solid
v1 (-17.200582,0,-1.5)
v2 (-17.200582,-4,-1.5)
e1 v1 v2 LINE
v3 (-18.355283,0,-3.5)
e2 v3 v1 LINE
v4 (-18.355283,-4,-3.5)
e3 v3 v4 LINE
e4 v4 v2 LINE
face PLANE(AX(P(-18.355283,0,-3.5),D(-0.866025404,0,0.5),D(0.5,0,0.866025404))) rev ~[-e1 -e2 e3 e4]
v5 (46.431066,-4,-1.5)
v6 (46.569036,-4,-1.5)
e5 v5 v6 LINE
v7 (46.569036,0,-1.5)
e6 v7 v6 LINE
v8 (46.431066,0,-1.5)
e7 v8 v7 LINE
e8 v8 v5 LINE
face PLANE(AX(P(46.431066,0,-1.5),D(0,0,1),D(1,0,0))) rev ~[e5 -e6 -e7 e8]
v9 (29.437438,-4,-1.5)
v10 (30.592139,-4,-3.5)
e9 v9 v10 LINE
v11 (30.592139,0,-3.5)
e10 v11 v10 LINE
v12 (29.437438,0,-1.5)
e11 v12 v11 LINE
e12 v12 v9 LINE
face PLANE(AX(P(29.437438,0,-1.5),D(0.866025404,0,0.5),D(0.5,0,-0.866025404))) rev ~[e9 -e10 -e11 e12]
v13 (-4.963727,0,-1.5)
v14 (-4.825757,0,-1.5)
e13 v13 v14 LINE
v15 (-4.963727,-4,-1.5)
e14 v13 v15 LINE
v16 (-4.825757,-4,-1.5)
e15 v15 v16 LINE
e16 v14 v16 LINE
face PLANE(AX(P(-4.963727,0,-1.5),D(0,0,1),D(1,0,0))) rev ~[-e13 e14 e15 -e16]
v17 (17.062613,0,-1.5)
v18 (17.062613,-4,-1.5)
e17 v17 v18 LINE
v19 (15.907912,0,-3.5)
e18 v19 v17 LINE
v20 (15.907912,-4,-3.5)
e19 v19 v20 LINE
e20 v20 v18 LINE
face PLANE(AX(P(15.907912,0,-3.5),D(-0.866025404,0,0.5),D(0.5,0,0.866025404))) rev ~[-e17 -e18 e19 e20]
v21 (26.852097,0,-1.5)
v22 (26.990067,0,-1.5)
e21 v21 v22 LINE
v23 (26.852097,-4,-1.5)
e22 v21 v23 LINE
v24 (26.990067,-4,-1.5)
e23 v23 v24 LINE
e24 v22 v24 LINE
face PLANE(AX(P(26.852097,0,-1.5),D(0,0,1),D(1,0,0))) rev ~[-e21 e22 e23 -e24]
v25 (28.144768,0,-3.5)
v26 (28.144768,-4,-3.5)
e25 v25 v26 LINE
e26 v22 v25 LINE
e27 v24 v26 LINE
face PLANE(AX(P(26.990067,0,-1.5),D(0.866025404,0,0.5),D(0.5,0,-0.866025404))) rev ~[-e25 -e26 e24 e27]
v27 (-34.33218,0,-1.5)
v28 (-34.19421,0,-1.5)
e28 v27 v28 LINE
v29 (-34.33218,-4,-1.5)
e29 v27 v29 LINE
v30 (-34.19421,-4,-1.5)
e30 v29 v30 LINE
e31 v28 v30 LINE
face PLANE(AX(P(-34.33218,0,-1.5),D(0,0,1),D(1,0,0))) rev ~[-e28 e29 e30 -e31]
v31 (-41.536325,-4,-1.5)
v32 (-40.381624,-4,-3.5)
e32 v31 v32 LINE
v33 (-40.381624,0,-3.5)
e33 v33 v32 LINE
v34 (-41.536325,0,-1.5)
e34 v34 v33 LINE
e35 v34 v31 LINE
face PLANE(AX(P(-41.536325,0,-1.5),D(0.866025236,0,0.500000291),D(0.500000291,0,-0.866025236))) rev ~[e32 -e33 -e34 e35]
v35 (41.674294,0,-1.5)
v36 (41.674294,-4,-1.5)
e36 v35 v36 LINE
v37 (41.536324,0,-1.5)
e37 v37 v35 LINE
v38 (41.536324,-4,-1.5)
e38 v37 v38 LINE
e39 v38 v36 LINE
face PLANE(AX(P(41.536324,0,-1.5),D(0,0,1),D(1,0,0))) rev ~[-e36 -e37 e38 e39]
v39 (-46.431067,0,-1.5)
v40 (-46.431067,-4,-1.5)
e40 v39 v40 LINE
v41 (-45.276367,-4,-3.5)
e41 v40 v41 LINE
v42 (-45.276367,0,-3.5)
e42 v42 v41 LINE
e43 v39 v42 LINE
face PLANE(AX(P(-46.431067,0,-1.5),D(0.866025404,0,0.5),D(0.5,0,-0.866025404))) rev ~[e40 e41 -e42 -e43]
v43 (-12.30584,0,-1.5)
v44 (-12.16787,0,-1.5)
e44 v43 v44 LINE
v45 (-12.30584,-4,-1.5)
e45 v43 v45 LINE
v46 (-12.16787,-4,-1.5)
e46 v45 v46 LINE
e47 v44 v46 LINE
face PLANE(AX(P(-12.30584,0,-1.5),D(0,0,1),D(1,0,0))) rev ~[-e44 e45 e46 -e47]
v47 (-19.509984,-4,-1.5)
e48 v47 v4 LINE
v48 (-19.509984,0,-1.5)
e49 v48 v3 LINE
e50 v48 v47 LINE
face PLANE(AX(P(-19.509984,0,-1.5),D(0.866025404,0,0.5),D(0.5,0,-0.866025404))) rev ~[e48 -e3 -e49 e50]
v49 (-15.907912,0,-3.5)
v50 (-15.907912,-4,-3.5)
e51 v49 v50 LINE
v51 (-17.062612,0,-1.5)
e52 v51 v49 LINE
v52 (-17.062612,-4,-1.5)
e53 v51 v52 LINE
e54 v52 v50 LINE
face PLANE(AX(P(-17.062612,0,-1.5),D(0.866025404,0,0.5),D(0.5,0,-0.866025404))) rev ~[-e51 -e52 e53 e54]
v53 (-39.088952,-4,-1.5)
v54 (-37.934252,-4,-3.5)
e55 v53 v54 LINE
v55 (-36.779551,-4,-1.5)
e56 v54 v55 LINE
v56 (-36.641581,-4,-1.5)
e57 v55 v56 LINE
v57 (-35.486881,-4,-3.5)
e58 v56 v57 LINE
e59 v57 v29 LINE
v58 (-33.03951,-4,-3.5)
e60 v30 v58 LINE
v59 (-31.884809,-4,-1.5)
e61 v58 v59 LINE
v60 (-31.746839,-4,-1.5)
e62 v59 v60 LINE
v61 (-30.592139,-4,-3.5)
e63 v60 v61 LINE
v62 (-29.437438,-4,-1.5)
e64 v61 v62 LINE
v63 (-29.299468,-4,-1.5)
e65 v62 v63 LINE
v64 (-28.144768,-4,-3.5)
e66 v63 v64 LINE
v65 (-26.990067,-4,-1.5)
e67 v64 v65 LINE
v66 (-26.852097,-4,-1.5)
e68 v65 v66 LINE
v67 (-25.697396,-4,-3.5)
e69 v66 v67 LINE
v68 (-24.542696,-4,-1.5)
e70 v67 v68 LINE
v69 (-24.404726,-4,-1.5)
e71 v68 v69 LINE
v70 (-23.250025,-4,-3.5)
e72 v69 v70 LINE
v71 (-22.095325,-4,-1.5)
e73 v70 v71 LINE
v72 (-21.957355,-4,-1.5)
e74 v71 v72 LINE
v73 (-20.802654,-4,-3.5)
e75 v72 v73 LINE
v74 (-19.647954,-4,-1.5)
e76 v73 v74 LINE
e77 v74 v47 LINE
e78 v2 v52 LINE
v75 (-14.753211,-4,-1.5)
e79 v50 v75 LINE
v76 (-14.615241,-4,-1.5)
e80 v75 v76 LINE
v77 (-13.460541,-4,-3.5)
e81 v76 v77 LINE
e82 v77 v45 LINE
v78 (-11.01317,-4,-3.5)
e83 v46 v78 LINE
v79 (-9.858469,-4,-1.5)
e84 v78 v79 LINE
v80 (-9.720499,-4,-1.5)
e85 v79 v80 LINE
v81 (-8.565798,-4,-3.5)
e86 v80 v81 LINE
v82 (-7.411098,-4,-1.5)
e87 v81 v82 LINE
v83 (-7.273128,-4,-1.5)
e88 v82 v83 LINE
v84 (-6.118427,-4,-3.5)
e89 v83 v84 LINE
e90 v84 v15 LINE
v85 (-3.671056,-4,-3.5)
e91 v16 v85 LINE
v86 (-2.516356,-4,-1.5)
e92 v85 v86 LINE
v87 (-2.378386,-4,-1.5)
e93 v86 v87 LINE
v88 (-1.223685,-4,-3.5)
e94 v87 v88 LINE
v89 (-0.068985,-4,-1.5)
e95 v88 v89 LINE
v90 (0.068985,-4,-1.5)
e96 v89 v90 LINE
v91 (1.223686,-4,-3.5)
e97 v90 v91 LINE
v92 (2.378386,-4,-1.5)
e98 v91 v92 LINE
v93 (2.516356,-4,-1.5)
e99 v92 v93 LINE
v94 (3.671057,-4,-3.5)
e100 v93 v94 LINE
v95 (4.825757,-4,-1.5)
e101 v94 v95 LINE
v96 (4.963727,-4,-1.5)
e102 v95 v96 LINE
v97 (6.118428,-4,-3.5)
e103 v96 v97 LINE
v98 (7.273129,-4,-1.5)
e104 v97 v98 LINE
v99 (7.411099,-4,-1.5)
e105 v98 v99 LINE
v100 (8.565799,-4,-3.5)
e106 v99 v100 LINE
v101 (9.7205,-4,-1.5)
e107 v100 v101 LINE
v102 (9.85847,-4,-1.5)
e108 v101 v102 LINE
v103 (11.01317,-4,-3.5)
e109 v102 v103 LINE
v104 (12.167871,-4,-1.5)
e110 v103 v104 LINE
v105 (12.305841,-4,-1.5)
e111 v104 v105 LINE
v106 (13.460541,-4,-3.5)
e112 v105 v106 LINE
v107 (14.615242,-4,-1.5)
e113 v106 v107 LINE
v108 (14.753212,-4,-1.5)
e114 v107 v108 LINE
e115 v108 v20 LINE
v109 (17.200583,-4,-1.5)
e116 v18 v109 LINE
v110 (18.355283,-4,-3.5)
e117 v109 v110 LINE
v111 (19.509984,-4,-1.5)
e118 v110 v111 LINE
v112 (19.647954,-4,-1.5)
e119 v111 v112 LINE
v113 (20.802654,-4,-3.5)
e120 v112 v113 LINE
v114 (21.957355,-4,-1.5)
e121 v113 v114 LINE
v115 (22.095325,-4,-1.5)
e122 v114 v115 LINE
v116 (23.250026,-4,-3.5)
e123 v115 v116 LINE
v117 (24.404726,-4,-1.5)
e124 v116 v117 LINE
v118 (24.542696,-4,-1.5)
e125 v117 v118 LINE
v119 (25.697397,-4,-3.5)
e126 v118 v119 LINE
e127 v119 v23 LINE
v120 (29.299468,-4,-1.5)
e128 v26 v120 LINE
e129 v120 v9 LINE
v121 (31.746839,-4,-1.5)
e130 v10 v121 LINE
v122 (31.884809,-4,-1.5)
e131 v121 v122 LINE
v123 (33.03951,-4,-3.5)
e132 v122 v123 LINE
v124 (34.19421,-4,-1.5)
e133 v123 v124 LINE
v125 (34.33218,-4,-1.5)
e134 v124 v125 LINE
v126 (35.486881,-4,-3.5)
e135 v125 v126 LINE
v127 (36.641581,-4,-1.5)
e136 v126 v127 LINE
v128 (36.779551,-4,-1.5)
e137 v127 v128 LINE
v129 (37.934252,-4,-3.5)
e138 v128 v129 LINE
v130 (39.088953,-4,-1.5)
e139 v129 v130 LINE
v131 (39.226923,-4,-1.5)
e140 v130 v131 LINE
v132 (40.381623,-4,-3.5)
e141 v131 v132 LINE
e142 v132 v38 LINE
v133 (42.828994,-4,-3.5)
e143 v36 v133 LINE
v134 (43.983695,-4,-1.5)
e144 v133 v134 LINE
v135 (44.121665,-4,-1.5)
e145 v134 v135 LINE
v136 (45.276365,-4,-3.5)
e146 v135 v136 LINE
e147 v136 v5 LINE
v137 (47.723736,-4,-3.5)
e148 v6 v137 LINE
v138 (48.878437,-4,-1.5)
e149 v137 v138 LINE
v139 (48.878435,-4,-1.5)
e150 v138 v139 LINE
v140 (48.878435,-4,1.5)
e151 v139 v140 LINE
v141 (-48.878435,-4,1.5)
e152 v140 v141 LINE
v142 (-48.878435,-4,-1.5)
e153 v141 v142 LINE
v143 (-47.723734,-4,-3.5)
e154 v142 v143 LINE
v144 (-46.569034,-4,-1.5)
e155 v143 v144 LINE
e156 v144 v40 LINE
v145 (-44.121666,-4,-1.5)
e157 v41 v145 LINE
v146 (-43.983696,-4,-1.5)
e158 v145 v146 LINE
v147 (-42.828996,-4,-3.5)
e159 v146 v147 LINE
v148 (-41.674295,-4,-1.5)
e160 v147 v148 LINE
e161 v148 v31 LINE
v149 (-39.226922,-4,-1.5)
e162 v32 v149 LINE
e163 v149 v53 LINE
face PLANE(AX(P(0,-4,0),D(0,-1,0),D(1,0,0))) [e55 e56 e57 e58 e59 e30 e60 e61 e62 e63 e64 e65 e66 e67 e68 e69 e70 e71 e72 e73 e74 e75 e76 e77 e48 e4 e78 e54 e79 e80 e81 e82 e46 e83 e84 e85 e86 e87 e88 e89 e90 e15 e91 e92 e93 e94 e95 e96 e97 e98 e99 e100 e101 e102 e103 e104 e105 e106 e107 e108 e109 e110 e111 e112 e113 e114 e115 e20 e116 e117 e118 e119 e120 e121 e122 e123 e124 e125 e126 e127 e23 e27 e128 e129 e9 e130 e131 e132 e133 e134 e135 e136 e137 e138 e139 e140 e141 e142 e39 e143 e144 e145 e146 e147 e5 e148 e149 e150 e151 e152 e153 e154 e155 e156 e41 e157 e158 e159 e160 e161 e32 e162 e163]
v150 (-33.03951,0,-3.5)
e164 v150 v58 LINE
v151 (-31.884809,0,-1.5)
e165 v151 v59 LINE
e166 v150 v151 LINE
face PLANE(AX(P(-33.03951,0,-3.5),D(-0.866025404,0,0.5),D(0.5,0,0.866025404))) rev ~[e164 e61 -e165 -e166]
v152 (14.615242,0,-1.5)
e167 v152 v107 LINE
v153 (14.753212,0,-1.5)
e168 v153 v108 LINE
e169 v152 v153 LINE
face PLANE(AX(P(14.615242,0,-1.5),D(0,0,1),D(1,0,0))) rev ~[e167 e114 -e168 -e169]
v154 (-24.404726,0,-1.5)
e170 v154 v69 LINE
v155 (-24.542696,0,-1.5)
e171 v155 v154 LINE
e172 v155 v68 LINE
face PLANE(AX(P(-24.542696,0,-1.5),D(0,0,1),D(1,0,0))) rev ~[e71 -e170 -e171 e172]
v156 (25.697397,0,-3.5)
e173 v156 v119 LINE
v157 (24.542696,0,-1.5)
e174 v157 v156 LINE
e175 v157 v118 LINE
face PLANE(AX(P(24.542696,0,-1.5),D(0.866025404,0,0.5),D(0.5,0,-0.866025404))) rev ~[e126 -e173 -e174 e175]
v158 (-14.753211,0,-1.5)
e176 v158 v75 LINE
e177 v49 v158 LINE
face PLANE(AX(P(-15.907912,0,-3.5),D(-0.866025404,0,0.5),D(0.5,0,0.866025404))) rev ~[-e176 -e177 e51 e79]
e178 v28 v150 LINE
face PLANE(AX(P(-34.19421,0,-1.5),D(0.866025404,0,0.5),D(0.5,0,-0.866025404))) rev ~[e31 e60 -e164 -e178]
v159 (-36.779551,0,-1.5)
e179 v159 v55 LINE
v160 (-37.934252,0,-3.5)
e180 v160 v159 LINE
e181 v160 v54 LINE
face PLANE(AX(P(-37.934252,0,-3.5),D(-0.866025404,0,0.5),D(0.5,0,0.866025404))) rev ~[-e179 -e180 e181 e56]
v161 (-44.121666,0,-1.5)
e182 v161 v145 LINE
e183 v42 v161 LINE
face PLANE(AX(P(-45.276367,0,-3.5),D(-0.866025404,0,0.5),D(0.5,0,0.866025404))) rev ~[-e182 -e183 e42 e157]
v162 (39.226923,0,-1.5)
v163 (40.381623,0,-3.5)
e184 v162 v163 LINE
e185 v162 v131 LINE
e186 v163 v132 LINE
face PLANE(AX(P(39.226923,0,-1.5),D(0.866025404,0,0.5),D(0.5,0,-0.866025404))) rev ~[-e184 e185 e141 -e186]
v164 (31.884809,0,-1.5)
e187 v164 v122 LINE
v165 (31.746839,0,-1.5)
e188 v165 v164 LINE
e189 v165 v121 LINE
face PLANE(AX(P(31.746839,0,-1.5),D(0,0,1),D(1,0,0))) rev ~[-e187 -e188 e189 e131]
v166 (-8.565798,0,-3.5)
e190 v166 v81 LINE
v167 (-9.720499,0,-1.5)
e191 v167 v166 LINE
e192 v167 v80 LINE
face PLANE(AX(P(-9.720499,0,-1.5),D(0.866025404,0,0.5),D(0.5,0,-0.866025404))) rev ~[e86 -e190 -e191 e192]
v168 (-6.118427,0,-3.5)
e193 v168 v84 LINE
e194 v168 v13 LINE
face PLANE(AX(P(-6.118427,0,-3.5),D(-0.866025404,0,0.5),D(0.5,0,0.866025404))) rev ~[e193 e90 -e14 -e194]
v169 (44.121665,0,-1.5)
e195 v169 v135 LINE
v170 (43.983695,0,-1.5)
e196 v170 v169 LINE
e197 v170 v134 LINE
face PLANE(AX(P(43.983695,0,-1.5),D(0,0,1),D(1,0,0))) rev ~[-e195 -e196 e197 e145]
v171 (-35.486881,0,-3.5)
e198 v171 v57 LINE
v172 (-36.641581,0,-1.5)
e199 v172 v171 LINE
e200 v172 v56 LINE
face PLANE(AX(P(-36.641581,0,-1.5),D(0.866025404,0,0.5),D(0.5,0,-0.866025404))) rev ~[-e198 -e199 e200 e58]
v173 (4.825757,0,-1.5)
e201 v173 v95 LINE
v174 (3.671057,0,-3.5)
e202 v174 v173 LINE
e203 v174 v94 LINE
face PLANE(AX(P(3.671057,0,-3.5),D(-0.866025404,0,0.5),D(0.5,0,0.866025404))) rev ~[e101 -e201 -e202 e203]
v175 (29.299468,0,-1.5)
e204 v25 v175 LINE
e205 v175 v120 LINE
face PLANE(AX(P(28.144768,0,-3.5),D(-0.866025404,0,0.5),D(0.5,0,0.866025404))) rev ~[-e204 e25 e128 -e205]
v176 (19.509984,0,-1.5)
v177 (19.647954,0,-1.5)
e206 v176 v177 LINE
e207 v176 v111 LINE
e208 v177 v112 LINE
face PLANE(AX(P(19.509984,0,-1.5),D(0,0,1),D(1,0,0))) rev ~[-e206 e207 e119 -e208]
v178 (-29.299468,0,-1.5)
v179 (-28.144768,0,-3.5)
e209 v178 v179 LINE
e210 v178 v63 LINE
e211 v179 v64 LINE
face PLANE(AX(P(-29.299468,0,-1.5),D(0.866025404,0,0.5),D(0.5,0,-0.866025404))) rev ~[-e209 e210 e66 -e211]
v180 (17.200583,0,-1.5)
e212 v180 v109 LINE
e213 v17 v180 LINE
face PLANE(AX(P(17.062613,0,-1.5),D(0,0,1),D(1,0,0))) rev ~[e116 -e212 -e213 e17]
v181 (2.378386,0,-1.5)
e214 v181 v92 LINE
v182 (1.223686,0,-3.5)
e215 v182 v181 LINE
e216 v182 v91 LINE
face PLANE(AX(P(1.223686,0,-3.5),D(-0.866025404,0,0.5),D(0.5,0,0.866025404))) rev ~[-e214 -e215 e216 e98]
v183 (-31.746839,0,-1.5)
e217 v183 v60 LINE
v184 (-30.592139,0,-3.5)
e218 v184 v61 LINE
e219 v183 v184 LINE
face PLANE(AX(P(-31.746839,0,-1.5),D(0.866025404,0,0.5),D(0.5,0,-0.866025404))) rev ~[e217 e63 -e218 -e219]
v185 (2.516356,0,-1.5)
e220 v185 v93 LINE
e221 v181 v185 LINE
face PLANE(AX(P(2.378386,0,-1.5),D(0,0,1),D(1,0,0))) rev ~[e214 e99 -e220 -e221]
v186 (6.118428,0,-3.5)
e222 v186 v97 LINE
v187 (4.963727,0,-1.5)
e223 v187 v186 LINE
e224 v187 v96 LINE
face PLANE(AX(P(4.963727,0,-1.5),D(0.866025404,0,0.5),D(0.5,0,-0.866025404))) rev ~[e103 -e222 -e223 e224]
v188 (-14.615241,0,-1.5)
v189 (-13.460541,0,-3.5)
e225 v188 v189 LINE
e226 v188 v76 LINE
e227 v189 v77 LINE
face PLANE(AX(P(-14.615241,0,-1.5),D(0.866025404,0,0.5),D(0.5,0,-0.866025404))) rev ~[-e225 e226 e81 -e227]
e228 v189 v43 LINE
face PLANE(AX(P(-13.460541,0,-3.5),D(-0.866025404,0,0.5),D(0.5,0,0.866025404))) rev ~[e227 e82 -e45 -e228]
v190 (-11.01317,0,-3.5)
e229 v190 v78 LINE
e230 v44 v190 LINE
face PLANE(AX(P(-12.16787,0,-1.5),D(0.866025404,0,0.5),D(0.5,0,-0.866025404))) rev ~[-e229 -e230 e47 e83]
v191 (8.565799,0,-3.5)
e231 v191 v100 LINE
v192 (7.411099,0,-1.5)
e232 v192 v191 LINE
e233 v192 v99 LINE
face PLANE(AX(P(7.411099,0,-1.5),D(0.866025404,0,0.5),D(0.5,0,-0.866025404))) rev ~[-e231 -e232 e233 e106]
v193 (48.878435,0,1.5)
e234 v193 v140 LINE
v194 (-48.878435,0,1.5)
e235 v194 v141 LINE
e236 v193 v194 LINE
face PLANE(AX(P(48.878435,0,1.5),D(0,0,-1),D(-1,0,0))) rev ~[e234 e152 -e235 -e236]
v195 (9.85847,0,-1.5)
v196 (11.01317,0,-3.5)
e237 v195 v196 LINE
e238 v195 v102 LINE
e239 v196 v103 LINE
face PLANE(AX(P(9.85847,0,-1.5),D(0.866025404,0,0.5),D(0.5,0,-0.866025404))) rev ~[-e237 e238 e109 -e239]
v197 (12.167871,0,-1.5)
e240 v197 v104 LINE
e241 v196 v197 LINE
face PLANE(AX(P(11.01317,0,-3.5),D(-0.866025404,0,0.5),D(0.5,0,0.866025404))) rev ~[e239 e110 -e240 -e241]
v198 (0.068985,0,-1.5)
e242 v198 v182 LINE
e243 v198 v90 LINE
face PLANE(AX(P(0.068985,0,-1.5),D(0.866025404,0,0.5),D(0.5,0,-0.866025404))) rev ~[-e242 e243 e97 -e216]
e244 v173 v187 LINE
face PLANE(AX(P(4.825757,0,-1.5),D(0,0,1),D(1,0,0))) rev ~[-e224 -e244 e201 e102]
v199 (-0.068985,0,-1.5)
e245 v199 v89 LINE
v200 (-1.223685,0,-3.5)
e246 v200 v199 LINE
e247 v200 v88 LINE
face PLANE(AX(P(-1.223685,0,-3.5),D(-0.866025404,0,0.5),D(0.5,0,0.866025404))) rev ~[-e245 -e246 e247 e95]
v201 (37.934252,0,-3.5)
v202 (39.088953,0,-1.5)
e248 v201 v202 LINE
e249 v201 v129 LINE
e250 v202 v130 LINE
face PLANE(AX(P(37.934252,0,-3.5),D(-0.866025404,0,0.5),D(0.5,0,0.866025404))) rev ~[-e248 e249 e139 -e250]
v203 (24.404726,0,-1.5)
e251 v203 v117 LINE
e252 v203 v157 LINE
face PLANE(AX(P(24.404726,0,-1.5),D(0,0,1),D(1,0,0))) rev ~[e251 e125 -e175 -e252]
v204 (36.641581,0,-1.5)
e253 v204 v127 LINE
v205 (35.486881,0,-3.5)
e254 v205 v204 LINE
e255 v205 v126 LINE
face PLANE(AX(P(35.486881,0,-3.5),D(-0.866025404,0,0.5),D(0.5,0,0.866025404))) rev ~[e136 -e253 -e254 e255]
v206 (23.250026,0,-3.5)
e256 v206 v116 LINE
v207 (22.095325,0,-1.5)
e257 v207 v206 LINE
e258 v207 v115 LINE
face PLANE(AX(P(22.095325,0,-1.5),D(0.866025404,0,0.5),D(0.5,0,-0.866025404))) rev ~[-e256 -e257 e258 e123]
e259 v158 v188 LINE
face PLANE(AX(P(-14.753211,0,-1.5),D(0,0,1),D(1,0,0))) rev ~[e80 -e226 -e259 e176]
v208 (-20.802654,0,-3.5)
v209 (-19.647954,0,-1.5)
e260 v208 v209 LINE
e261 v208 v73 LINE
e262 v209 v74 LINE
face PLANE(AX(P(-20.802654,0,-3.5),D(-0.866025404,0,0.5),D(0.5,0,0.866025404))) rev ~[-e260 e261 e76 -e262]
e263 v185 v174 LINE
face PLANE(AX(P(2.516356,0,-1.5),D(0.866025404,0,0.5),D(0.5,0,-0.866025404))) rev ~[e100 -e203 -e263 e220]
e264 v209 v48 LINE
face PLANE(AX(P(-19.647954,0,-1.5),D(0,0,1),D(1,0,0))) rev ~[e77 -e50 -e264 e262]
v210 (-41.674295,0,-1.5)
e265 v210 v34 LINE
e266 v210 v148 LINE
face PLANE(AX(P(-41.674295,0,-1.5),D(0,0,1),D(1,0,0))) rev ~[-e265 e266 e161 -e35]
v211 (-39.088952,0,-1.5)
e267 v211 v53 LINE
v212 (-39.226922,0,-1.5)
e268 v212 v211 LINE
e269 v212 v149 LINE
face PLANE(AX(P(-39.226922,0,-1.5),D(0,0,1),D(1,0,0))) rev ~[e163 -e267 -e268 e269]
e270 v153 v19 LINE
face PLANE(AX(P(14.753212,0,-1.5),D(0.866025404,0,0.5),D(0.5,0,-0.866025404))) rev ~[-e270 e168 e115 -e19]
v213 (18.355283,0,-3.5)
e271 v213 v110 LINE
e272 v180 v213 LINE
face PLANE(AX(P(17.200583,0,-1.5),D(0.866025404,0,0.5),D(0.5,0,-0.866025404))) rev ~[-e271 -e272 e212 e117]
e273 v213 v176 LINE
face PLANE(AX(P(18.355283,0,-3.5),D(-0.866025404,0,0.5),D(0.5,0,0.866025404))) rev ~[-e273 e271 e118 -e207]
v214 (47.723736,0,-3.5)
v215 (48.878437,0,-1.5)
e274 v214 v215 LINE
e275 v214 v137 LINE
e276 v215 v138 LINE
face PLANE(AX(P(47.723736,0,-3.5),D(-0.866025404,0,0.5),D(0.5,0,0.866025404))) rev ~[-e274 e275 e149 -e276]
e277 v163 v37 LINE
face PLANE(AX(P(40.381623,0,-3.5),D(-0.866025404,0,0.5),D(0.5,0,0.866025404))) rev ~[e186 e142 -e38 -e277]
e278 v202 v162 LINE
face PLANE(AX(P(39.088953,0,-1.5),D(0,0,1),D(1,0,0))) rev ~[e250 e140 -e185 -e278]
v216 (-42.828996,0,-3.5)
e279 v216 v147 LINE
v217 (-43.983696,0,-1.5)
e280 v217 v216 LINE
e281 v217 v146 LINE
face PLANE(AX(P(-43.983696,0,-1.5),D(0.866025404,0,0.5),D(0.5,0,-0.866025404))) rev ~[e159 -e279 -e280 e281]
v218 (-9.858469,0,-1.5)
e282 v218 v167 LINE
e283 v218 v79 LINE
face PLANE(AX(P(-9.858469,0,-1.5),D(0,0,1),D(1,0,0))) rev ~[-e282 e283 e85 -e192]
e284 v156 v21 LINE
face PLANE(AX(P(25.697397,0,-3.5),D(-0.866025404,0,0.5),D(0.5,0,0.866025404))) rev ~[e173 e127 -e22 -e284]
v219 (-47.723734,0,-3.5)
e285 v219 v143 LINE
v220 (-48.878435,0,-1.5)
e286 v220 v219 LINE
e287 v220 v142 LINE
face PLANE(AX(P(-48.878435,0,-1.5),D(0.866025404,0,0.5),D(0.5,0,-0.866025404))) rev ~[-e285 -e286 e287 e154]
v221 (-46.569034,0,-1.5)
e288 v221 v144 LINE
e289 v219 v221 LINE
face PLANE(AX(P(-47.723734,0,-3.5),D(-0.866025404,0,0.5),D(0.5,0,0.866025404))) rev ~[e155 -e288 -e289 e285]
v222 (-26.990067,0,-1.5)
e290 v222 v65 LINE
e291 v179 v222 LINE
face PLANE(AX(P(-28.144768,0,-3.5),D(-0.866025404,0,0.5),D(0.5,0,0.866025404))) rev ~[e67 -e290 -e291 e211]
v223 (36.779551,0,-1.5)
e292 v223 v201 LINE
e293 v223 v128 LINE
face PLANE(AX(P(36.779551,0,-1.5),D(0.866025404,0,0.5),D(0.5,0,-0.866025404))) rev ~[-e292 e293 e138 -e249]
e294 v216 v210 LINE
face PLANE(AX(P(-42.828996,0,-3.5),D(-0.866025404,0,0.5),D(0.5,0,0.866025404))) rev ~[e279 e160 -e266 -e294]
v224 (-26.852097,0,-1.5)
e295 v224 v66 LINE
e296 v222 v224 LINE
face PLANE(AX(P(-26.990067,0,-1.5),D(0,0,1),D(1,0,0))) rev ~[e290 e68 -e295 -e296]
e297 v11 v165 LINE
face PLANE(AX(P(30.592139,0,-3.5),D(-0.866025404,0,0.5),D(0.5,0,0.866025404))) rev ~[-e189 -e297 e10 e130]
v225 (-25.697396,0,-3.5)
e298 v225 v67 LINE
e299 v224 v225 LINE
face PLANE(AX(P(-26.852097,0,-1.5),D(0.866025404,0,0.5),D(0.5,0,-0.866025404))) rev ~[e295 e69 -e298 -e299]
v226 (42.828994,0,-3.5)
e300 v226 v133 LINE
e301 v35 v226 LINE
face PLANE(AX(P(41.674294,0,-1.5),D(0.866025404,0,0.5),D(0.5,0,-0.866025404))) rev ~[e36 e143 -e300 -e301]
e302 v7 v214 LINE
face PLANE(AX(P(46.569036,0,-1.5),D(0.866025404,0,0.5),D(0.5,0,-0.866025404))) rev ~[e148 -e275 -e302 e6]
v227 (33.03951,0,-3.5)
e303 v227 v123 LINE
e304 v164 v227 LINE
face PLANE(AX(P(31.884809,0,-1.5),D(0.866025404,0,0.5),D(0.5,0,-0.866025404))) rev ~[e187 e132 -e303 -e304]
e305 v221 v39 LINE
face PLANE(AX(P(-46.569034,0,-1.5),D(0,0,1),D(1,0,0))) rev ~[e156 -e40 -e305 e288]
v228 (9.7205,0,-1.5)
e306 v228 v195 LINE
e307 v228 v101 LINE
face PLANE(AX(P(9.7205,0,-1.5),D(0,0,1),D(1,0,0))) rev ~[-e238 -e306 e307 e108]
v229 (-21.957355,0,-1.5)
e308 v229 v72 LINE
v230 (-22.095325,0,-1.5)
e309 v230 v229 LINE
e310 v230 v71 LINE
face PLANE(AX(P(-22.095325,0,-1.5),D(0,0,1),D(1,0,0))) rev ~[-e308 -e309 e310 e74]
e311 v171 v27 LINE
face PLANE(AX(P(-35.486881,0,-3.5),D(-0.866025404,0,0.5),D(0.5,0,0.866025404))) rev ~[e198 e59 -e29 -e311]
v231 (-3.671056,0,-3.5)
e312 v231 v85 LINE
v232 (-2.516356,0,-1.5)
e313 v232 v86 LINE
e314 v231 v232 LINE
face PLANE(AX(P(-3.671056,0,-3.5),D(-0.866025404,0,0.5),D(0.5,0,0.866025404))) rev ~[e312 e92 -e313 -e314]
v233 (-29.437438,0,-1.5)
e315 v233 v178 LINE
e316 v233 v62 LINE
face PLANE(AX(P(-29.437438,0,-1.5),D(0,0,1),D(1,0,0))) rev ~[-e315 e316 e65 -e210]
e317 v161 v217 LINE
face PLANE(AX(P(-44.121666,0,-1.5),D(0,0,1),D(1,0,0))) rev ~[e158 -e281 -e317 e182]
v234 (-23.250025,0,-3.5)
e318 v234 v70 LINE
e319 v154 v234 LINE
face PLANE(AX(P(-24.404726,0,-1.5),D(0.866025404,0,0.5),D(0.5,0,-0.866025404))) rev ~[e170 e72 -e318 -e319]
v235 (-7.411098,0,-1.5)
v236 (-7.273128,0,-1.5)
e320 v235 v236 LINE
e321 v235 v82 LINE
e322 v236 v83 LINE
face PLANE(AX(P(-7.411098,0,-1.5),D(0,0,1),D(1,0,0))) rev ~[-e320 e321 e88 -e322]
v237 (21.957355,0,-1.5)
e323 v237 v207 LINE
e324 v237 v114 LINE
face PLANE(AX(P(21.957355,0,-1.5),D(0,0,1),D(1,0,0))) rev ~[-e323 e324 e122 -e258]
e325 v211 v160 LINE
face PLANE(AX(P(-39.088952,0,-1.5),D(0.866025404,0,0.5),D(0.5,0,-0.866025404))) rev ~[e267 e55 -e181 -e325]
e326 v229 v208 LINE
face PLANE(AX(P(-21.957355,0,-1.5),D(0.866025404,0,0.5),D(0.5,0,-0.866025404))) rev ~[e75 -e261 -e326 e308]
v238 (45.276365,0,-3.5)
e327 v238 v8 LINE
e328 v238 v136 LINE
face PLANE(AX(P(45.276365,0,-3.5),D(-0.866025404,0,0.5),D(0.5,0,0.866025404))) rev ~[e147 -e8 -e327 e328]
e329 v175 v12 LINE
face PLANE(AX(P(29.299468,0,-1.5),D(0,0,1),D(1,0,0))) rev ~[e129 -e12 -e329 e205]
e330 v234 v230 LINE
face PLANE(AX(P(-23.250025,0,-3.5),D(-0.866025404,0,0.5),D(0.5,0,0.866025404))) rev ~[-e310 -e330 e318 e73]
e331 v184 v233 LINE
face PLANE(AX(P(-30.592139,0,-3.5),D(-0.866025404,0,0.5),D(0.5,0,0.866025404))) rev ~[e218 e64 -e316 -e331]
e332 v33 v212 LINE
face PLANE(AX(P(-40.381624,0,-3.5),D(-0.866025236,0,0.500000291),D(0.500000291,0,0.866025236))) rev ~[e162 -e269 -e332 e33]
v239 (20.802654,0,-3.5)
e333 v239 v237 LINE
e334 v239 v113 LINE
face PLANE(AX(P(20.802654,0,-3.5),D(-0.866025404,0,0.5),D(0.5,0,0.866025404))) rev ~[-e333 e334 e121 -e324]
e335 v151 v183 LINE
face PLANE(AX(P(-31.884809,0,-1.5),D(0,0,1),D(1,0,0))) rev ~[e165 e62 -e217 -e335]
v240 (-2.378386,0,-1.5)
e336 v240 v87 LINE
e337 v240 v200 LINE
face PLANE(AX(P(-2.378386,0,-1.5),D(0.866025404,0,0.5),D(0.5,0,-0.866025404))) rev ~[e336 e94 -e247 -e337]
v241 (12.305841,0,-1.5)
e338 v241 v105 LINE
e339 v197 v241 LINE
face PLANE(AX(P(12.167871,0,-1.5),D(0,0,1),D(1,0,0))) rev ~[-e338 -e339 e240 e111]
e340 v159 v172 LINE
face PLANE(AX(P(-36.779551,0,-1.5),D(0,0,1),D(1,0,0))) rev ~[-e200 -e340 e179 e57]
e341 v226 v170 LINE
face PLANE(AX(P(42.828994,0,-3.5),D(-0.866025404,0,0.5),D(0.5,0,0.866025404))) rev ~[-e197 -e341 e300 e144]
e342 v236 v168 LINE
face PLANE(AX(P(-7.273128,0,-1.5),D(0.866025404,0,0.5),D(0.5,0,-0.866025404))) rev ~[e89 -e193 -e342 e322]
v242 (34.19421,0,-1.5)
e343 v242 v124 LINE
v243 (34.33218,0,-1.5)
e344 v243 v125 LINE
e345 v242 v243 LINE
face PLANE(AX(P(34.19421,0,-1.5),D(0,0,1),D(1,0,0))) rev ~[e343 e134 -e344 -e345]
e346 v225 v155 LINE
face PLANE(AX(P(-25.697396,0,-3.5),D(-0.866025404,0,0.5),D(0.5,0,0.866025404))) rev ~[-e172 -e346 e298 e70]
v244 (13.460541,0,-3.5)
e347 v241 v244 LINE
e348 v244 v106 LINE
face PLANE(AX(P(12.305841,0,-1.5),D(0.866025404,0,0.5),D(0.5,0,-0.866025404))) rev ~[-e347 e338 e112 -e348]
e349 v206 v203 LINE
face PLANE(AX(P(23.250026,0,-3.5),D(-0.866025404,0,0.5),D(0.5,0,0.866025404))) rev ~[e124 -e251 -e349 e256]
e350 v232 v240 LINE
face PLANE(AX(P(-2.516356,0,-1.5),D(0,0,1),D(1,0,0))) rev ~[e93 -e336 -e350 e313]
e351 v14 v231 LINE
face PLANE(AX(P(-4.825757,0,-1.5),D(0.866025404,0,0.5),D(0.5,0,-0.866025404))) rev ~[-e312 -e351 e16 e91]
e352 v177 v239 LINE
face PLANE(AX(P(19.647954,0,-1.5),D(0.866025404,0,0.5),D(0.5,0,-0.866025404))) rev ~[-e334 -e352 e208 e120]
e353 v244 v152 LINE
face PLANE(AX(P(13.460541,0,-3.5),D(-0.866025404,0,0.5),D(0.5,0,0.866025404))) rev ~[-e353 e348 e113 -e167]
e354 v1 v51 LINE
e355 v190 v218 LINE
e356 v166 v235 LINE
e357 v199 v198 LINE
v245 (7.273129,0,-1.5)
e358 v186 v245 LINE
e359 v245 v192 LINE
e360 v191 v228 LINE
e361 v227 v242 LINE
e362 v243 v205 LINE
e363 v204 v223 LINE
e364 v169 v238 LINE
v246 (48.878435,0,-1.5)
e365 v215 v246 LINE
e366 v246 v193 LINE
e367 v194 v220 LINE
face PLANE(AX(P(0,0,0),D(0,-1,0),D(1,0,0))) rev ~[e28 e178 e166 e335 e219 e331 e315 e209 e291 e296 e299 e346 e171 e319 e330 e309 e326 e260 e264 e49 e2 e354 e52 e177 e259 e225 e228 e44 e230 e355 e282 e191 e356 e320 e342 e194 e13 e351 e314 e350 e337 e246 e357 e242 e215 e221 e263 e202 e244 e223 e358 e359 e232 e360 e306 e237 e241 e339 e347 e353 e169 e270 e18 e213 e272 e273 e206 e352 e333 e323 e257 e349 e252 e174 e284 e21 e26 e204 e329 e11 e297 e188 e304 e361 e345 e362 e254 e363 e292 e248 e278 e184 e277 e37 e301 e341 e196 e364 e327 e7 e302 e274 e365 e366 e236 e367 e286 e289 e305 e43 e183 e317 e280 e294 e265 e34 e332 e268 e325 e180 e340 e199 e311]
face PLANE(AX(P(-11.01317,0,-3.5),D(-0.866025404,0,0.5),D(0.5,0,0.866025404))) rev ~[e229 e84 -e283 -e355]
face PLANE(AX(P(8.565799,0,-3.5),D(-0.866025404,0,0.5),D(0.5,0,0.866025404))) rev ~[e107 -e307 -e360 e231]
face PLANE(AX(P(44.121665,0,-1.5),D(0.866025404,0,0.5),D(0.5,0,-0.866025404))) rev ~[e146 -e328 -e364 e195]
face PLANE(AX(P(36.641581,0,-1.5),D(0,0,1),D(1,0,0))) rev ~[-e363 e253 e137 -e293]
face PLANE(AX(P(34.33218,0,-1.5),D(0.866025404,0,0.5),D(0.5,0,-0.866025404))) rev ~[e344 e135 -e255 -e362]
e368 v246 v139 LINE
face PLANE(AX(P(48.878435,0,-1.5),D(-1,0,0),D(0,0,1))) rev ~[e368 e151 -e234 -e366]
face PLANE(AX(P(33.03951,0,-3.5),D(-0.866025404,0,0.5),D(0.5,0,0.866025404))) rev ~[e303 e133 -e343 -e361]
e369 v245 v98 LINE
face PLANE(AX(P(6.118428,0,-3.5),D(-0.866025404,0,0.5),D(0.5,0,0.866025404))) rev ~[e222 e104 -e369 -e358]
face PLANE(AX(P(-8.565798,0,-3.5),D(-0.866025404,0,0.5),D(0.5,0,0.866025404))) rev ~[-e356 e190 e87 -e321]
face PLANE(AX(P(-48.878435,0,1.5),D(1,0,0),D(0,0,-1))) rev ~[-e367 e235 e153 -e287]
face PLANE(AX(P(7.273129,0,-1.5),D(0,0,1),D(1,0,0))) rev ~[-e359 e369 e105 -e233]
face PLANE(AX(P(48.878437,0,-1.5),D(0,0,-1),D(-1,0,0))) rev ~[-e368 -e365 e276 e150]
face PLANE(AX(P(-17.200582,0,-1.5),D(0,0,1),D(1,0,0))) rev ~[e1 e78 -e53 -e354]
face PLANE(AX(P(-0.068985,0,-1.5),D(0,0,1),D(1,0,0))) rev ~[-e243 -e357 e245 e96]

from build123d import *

# Parameters (mm, degrees)
F1_DEPTH = 4


# Not quite as in the source:
# - ends of sketch curves that miss each other by under 0.0002 mm in the source are joined


with BuildPart() as f1:
    # F0 (on Front) → F1 (new body)
    with BuildSketch(Plane.XZ):
        Polygon((48.878435, 1.5), (-48.878435, 1.5), (-48.878435, -1.5), (-46.5690339232, -1.5), (-46.4310674122, -1.5), (-44.1216663354, -1.5), (-43.9836963354, -1.5), (-41.6742952587, -1.5), (-41.5363252587, -1.5), (-39.22692239, -1.5), (-39.08895239, -1.5), (-36.7795513132, -1.5), (-36.6415813132, -1.5), (-34.3321802365, -1.5), (-34.1942102365, -1.5), (-31.8848091597, -1.5), (-31.7468391597, -1.5), (-29.4374380829, -1.5), (-29.2994680829, -1.5), (-26.9900670062, -1.5), (-26.8520970062, -1.5), (-24.5426959294, -1.5), (-24.4047259294, -1.5), (-22.0953248527, -1.5), (-21.9573548527, -1.5), (-19.6479537759, -1.5), (-19.5099837759, -1.5), (-17.2005822649, -1.5), (-17.062612265, -1.5), (-14.7532111882, -1.5), (-14.6152411882, -1.5), (-12.3058401114, -1.5), (-12.1678701114, -1.5), (-9.8584690347, -1.5), (-9.7204990347, -1.5), (-7.4110979579, -1.5), (-7.2731279579, -1.5), (-4.9637268812, -1.5), (-4.8257568812, -1.5), (-2.5163558044, -1.5), (-2.3783858044, -1.5), (-0.0689847276, -1.5), (0.0689852724, -1.5), (2.3783863491, -1.5), (2.5163563491, -1.5), (4.8257574259, -1.5), (4.9637274259, -1.5), (7.2731285026, -1.5), (7.4110985026, -1.5), (9.7204995794, -1.5), (9.8584695794, -1.5), (12.1678706561, -1.5), (12.3058406561, -1.5), (14.6152417329, -1.5), (14.7532117329, -1.5), (17.0626128097, -1.5), (17.2005828097, -1.5), (19.5099838864, -1.5), (19.6479538864, -1.5), (21.5619457761, -1.5), (21.9573549632, -1.5), (22.0953249632, -1.5), (23.8713468528, -1.5), (24.4047260399, -1.5), (24.5426960399, -1.5), (26.8520971167, -1.5), (26.9900671167, -1.5), (29.2994681935, -1.5), (29.4374381935, -1.5), (31.7468392702, -1.5), (31.8848092702, -1.5), (34.194210347, -1.5), (34.332180347, -1.5), (36.6415814237, -1.5), (36.7795514237, -1.5), (39.0889525005, -1.5), (39.2269225005, -1.5), (41.5363235773, -1.5), (41.6742935773, -1.5), (43.983694654, -1.5), (44.121664654, -1.5), (46.4310657308, -1.5), (46.5690357308, -1.5), (48.878435, -1.5), align=None)
        Polygon((-46.5690339232, -1.5), (-48.878435, -1.5), (-47.7237344616, -3.5), align=None)
        Polygon((47.7237362691, -3.5), (48.8784368075, -1.5), (46.5690357308, -1.5), align=None)
        Polygon((-44.1216663354, -1.5), (-46.4310674122, -1.5), (-45.2763668738, -3.5), align=None)
        Polygon((45.2763651924, -3.5), (46.4310657308, -1.5), (44.121664654, -1.5), align=None)
        Polygon((-41.6742952587, -1.5), (-43.9836963354, -1.5), (-42.8289957971, -3.5), align=None)
        Polygon((42.8289941156, -3.5), (43.983694654, -1.5), (41.6742935773, -1.5), align=None)
        Polygon((-39.22692239, -1.5), (-41.5363252587, -1.5), (-40.3816238243, -3.5), align=None)
        Polygon((40.3816230389, -3.5), (41.5363235773, -1.5), (39.2269225005, -1.5), align=None)
        Polygon((-36.7795513132, -1.5), (-39.08895239, -1.5), (-37.9342518516, -3.5), align=None)
        Polygon((37.9342519621, -3.5), (39.0889525005, -1.5), (36.7795514237, -1.5), align=None)
        Polygon((-34.3321802365, -1.5), (-36.6415813132, -1.5), (-35.4868807748, -3.5), align=None)
        Polygon((35.4868808854, -3.5), (36.6415814237, -1.5), (34.332180347, -1.5), align=None)
        Polygon((-31.8848091597, -1.5), (-34.1942102365, -1.5), (-33.0395096981, -3.5), align=None)
        Polygon((33.0395098086, -3.5), (34.194210347, -1.5), (31.8848092702, -1.5), align=None)
        Polygon((-29.4374380829, -1.5), (-31.7468391597, -1.5), (-30.5921386213, -3.5), align=None)
        Polygon((30.5921387318, -3.5), (31.7468392702, -1.5), (29.4374381935, -1.5), align=None)
        Polygon((-26.9900670062, -1.5), (-29.2994680829, -1.5), (-28.1447675446, -3.5), align=None)
        Polygon((28.1447676551, -3.5), (29.2994681935, -1.5), (26.9900671167, -1.5), align=None)
        Polygon((-24.5426959294, -1.5), (-26.8520970062, -1.5), (-25.6973964678, -3.5), align=None)
        Polygon((25.6973965783, -3.5), (26.8520971167, -1.5), (24.5426960399, -1.5), align=None)
        Polygon((-22.0953248527, -1.5), (-24.4047259294, -1.5), (-23.250025391, -3.5), align=None)
        Polygon((23.2500255016, -3.5), (24.4047260399, -1.5), (23.8713468528, -1.5), (22.0953249632, -1.5), align=None)
        Polygon((-19.6479537759, -1.5), (-21.9573548527, -1.5), (-20.8026543143, -3.5), align=None)
        Polygon((20.8026544248, -3.5), (21.9573549632, -1.5), (21.5619457761, -1.5), (19.6479538864, -1.5), align=None)
        Polygon((-17.2005822649, -1.5), (-19.5099837759, -1.5), (-18.3552830204, -3.500000376), align=None)
        Polygon((-14.7532111882, -1.5), (-17.062612265, -1.5), (-15.9079117266, -3.5), align=None)
        Polygon((18.355283348, -3.5), (19.5099838864, -1.5), (17.2005828097, -1.5), align=None)
        Polygon((-12.3058401114, -1.5), (-14.6152411882, -1.5), (-13.4605406498, -3.5), align=None)
        Polygon((15.9079122713, -3.5), (17.0626128097, -1.5), (14.7532117329, -1.5), align=None)
        Polygon((-9.8584690347, -1.5), (-12.1678701114, -1.5), (-11.0131695731, -3.5), align=None)
        Polygon((13.4605411945, -3.5), (14.6152417329, -1.5), (12.3058406561, -1.5), align=None)
        Polygon((-7.4110979579, -1.5), (-9.7204990347, -1.5), (-8.5657984963, -3.5), align=None)
        Polygon((11.0131701178, -3.5), (12.1678706561, -1.5), (9.8584695794, -1.5), align=None)
        Polygon((-4.9637268812, -1.5), (-7.2731279579, -1.5), (-6.1184274195, -3.5), align=None)
        Polygon((8.565799041, -3.5), (9.7204995794, -1.5), (7.4110985026, -1.5), align=None)
        Polygon((-2.5163558044, -1.5), (-4.8257568812, -1.5), (-3.6710563428, -3.5), align=None)
        Polygon((6.1184279642, -3.5), (7.2731285026, -1.5), (4.9637274259, -1.5), align=None)
        Polygon((-0.0689847276, -1.5), (-2.3783858044, -1.5), (-1.223685266, -3.5), align=None)
        Polygon((3.6710568875, -3.5), (4.8257574259, -1.5), (2.5163563491, -1.5), align=None)
        Polygon((2.3783863491, -1.5), (0.0689852724, -1.5), (1.2236858107, -3.5), align=None)
    extrude(amount=F1_DEPTH)


solid = f1.part
